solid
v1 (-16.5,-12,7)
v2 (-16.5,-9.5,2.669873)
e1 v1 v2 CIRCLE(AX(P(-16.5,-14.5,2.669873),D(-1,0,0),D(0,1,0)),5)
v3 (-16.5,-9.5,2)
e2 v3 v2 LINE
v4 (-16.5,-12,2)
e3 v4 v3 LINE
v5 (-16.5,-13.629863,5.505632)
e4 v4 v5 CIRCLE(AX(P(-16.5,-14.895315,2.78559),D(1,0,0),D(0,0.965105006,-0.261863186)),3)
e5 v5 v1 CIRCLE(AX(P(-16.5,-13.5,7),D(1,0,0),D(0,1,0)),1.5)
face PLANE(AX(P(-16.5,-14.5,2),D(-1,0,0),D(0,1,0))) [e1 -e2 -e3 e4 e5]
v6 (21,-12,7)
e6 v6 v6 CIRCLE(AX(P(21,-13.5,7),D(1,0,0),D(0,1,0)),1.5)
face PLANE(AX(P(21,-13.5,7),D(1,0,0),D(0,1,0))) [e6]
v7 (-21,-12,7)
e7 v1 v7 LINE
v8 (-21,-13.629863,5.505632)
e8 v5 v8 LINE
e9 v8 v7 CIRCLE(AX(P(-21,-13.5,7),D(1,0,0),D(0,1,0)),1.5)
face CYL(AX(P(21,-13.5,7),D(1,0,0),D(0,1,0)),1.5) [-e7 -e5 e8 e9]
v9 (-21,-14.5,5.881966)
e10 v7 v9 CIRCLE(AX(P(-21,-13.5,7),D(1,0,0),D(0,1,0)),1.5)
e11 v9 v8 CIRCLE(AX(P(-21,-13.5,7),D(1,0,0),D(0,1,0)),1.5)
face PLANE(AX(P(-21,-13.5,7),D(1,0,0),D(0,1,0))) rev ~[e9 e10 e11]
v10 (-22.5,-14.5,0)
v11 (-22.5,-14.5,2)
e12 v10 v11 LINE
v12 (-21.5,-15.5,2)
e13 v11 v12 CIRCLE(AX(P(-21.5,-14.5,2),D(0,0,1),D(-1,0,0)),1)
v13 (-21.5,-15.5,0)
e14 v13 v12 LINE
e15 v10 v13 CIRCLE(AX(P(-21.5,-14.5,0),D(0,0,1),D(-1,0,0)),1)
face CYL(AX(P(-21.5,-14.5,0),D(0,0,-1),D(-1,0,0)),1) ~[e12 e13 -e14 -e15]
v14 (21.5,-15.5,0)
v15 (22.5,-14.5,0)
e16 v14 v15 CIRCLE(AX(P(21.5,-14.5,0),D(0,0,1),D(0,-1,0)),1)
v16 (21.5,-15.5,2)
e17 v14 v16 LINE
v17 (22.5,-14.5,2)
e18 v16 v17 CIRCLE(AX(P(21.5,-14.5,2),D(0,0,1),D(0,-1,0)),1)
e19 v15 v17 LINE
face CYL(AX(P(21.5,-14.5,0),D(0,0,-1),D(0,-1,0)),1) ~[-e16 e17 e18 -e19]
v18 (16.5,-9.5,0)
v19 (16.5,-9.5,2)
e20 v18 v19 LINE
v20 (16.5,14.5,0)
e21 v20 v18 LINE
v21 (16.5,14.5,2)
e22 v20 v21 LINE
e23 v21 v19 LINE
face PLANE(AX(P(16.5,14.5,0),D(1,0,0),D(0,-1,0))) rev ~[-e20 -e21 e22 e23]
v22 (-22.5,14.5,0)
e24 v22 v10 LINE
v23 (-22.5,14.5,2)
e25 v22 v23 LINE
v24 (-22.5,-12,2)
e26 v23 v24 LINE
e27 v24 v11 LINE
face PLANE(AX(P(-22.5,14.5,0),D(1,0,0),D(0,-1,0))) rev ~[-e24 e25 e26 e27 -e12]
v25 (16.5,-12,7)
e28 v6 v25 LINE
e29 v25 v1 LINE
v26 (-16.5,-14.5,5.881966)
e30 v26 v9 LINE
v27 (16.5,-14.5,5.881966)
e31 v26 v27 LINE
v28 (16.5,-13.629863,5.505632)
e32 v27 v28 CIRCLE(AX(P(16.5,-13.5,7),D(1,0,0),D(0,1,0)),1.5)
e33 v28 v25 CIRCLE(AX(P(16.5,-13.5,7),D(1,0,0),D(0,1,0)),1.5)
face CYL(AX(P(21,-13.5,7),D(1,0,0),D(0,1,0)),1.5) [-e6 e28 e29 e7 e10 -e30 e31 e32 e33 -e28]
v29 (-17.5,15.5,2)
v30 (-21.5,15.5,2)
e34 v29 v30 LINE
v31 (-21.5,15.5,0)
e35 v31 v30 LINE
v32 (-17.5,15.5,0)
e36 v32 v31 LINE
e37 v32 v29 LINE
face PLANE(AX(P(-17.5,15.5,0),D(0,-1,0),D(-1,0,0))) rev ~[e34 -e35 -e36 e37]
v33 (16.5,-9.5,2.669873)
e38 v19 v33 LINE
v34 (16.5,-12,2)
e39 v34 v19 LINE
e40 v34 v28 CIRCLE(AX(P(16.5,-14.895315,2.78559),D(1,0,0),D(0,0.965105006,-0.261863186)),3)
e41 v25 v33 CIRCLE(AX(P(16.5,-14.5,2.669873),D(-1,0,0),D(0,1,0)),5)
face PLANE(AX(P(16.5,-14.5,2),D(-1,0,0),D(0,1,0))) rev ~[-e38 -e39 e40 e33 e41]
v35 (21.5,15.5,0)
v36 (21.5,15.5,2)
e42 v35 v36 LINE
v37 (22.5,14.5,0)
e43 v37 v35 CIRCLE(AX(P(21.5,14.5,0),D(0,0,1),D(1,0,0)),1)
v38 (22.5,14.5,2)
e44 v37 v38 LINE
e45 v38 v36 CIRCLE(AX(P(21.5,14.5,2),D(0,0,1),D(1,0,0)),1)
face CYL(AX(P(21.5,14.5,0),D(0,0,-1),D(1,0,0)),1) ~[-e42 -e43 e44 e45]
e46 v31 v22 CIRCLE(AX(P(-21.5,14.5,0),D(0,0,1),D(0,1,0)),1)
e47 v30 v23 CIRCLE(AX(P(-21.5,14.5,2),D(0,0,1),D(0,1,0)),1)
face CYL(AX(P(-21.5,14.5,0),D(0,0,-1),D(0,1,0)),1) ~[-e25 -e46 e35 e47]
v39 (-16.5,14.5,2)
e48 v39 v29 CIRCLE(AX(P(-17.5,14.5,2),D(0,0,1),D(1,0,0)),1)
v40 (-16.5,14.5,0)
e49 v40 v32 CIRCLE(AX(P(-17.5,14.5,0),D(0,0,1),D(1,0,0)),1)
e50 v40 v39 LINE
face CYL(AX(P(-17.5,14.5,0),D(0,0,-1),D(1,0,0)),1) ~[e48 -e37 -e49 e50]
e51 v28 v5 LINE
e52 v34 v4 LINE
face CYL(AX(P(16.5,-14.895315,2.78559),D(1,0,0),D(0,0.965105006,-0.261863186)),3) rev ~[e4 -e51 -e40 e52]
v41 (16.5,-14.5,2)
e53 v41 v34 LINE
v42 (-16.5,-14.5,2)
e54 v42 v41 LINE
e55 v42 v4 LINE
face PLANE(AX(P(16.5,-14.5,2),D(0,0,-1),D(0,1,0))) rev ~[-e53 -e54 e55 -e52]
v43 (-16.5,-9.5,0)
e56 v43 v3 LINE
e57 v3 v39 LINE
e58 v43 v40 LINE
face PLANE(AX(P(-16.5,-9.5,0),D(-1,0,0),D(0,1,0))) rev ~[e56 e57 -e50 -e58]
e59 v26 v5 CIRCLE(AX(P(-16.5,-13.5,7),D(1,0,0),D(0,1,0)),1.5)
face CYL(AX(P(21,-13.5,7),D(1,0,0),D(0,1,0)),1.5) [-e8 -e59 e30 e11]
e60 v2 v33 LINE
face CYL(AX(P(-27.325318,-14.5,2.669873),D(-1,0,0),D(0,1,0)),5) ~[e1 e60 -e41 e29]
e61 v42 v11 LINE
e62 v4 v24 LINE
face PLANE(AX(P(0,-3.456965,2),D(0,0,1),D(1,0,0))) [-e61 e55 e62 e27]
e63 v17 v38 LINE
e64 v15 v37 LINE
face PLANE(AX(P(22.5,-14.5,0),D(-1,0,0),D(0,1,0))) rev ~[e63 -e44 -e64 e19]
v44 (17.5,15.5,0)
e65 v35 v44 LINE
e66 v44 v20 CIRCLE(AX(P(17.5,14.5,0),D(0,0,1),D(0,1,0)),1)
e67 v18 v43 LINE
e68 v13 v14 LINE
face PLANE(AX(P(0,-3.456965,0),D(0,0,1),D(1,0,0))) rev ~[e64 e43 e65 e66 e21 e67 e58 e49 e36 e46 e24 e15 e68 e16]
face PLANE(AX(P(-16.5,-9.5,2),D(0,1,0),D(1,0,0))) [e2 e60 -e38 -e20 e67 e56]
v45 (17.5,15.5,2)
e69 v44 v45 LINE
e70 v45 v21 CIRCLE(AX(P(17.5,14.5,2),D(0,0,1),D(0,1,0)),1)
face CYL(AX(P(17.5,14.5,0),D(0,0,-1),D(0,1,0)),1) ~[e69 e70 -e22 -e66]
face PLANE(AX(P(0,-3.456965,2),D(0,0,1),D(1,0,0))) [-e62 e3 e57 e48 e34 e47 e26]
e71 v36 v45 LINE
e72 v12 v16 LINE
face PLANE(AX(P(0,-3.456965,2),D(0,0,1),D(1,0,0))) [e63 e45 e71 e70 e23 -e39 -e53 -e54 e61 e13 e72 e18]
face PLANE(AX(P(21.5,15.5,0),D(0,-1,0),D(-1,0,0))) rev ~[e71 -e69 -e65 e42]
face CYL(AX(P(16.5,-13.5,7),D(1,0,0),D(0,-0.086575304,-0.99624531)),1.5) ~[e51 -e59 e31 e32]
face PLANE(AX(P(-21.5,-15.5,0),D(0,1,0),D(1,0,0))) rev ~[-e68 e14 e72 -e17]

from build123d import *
from build123d import SkipClean  # not in build123d's __all__

# Parameters (mm, degrees)
F1_DEPTH    = 2
F2_W        = 33
F2_H        = 5
F3_DEPTH    = 5
F6_R        = 1.5
F7_DEPTH    = 42
F8_T1_DEPTH = 54.6506350946
F10_DEPTH   = 39.001


# Not quite as in the source:
# - a fillet or chamfer that OpenCascade refuses, or shapes differently, is made with other operations: its cross-section is extruded or revolved along the edge and cut away or added


with BuildPart() as f1:
    # F0 (on Top) → F1 (new body)
    with BuildSketch(Plane.XY):
        with BuildLine():
            Line((-21.5, -15.5), (21.5, -15.5))
            ThreePointArc((21.5, -15.5), (22.2071067812, -15.2071067812), (22.5, -14.5))
            Line((22.5, -14.5), (22.5, 14.5))
            ThreePointArc((22.5, 14.5), (22.2071067812, 15.2071067812), (21.5, 15.5))
            Line((21.5, 15.5), (17.5, 15.5))
            ThreePointArc((17.5, 15.5), (16.7928932188, 15.2071067812), (16.5, 14.5))
            Line((16.5, 14.5), (16.5, -9.5))
            Line((16.5, -9.5), (-16.5, -9.5))
            Line((-16.5, -9.5), (-16.5, 14.5))
            ThreePointArc((-16.5, 14.5), (-16.7928932188, 15.2071067812), (-17.5, 15.5))
            Line((-17.5, 15.5), (-21.5, 15.5))
            ThreePointArc((-21.5, 15.5), (-22.2071067812, 15.2071067812), (-22.5, 14.5))
            Line((-22.5, 14.5), (-22.5, -14.5))
            ThreePointArc((-22.5, -14.5), (-22.2071067812, -15.2071067812), (-21.5, -15.5))
        make_face()
    extrude(amount=F1_DEPTH)

    # F2 (on face) → F3 (join)
    with BuildSketch(Plane.XY.offset(2)):
        with Locations((0, -12)):
            Rectangle(F2_W, F2_H)
    extrude(amount=F3_DEPTH)

    # F6 (on offset) → F7 (join, through all)
    with BuildSketch(Plane.YZ.offset(21)):
        with Locations((-13.5, 7)):
            Circle(F6_R)
    extrude(amount=-F7_DEPTH)

    # F8: fillet of radius 5 on 1 edges, made by hand

    # F8_s2 → F8_t1 (cut)
    with BuildSketch(Plane.YZ.offset(-27.3253175473)):
        with BuildLine():
            ThreePointArc((-9.5, 2.6698729811), (-10.1698729811, 5.1698729811), (-12, 7))
            Line((-12, 7), (-9.5, 7))
            Line((-9.5, 7), (-9.5, 2.6698729811))
        make_face()
    extrude(amount=F8_T1_DEPTH, mode=Mode.SUBTRACT)

    # F9 (on face) → F10 (cut, through all)
    with BuildSketch(Plane.YZ.offset(16.5)):
        with BuildLine():
            ThreePointArc((-13.6298629558, 5.5056320357), (-14.0954446994, 5.6232481669), (-14.5, 5.8819660113))
            Line((-14.5, 5.8819660112), (-14.5, 2))
            Line((-14.5, 2), (-12, 2))
            ThreePointArc((-12, 2), (-12.1749548088, 4.0503584453), (-13.6298629558, 5.5056320357))
        make_face()
    with SkipClean():  # cleaning this boolean's faces spoils the solid; the shape is the same uncleaned
        extrude(amount=-F10_DEPTH, mode=Mode.SUBTRACT)


solid = f1.part
